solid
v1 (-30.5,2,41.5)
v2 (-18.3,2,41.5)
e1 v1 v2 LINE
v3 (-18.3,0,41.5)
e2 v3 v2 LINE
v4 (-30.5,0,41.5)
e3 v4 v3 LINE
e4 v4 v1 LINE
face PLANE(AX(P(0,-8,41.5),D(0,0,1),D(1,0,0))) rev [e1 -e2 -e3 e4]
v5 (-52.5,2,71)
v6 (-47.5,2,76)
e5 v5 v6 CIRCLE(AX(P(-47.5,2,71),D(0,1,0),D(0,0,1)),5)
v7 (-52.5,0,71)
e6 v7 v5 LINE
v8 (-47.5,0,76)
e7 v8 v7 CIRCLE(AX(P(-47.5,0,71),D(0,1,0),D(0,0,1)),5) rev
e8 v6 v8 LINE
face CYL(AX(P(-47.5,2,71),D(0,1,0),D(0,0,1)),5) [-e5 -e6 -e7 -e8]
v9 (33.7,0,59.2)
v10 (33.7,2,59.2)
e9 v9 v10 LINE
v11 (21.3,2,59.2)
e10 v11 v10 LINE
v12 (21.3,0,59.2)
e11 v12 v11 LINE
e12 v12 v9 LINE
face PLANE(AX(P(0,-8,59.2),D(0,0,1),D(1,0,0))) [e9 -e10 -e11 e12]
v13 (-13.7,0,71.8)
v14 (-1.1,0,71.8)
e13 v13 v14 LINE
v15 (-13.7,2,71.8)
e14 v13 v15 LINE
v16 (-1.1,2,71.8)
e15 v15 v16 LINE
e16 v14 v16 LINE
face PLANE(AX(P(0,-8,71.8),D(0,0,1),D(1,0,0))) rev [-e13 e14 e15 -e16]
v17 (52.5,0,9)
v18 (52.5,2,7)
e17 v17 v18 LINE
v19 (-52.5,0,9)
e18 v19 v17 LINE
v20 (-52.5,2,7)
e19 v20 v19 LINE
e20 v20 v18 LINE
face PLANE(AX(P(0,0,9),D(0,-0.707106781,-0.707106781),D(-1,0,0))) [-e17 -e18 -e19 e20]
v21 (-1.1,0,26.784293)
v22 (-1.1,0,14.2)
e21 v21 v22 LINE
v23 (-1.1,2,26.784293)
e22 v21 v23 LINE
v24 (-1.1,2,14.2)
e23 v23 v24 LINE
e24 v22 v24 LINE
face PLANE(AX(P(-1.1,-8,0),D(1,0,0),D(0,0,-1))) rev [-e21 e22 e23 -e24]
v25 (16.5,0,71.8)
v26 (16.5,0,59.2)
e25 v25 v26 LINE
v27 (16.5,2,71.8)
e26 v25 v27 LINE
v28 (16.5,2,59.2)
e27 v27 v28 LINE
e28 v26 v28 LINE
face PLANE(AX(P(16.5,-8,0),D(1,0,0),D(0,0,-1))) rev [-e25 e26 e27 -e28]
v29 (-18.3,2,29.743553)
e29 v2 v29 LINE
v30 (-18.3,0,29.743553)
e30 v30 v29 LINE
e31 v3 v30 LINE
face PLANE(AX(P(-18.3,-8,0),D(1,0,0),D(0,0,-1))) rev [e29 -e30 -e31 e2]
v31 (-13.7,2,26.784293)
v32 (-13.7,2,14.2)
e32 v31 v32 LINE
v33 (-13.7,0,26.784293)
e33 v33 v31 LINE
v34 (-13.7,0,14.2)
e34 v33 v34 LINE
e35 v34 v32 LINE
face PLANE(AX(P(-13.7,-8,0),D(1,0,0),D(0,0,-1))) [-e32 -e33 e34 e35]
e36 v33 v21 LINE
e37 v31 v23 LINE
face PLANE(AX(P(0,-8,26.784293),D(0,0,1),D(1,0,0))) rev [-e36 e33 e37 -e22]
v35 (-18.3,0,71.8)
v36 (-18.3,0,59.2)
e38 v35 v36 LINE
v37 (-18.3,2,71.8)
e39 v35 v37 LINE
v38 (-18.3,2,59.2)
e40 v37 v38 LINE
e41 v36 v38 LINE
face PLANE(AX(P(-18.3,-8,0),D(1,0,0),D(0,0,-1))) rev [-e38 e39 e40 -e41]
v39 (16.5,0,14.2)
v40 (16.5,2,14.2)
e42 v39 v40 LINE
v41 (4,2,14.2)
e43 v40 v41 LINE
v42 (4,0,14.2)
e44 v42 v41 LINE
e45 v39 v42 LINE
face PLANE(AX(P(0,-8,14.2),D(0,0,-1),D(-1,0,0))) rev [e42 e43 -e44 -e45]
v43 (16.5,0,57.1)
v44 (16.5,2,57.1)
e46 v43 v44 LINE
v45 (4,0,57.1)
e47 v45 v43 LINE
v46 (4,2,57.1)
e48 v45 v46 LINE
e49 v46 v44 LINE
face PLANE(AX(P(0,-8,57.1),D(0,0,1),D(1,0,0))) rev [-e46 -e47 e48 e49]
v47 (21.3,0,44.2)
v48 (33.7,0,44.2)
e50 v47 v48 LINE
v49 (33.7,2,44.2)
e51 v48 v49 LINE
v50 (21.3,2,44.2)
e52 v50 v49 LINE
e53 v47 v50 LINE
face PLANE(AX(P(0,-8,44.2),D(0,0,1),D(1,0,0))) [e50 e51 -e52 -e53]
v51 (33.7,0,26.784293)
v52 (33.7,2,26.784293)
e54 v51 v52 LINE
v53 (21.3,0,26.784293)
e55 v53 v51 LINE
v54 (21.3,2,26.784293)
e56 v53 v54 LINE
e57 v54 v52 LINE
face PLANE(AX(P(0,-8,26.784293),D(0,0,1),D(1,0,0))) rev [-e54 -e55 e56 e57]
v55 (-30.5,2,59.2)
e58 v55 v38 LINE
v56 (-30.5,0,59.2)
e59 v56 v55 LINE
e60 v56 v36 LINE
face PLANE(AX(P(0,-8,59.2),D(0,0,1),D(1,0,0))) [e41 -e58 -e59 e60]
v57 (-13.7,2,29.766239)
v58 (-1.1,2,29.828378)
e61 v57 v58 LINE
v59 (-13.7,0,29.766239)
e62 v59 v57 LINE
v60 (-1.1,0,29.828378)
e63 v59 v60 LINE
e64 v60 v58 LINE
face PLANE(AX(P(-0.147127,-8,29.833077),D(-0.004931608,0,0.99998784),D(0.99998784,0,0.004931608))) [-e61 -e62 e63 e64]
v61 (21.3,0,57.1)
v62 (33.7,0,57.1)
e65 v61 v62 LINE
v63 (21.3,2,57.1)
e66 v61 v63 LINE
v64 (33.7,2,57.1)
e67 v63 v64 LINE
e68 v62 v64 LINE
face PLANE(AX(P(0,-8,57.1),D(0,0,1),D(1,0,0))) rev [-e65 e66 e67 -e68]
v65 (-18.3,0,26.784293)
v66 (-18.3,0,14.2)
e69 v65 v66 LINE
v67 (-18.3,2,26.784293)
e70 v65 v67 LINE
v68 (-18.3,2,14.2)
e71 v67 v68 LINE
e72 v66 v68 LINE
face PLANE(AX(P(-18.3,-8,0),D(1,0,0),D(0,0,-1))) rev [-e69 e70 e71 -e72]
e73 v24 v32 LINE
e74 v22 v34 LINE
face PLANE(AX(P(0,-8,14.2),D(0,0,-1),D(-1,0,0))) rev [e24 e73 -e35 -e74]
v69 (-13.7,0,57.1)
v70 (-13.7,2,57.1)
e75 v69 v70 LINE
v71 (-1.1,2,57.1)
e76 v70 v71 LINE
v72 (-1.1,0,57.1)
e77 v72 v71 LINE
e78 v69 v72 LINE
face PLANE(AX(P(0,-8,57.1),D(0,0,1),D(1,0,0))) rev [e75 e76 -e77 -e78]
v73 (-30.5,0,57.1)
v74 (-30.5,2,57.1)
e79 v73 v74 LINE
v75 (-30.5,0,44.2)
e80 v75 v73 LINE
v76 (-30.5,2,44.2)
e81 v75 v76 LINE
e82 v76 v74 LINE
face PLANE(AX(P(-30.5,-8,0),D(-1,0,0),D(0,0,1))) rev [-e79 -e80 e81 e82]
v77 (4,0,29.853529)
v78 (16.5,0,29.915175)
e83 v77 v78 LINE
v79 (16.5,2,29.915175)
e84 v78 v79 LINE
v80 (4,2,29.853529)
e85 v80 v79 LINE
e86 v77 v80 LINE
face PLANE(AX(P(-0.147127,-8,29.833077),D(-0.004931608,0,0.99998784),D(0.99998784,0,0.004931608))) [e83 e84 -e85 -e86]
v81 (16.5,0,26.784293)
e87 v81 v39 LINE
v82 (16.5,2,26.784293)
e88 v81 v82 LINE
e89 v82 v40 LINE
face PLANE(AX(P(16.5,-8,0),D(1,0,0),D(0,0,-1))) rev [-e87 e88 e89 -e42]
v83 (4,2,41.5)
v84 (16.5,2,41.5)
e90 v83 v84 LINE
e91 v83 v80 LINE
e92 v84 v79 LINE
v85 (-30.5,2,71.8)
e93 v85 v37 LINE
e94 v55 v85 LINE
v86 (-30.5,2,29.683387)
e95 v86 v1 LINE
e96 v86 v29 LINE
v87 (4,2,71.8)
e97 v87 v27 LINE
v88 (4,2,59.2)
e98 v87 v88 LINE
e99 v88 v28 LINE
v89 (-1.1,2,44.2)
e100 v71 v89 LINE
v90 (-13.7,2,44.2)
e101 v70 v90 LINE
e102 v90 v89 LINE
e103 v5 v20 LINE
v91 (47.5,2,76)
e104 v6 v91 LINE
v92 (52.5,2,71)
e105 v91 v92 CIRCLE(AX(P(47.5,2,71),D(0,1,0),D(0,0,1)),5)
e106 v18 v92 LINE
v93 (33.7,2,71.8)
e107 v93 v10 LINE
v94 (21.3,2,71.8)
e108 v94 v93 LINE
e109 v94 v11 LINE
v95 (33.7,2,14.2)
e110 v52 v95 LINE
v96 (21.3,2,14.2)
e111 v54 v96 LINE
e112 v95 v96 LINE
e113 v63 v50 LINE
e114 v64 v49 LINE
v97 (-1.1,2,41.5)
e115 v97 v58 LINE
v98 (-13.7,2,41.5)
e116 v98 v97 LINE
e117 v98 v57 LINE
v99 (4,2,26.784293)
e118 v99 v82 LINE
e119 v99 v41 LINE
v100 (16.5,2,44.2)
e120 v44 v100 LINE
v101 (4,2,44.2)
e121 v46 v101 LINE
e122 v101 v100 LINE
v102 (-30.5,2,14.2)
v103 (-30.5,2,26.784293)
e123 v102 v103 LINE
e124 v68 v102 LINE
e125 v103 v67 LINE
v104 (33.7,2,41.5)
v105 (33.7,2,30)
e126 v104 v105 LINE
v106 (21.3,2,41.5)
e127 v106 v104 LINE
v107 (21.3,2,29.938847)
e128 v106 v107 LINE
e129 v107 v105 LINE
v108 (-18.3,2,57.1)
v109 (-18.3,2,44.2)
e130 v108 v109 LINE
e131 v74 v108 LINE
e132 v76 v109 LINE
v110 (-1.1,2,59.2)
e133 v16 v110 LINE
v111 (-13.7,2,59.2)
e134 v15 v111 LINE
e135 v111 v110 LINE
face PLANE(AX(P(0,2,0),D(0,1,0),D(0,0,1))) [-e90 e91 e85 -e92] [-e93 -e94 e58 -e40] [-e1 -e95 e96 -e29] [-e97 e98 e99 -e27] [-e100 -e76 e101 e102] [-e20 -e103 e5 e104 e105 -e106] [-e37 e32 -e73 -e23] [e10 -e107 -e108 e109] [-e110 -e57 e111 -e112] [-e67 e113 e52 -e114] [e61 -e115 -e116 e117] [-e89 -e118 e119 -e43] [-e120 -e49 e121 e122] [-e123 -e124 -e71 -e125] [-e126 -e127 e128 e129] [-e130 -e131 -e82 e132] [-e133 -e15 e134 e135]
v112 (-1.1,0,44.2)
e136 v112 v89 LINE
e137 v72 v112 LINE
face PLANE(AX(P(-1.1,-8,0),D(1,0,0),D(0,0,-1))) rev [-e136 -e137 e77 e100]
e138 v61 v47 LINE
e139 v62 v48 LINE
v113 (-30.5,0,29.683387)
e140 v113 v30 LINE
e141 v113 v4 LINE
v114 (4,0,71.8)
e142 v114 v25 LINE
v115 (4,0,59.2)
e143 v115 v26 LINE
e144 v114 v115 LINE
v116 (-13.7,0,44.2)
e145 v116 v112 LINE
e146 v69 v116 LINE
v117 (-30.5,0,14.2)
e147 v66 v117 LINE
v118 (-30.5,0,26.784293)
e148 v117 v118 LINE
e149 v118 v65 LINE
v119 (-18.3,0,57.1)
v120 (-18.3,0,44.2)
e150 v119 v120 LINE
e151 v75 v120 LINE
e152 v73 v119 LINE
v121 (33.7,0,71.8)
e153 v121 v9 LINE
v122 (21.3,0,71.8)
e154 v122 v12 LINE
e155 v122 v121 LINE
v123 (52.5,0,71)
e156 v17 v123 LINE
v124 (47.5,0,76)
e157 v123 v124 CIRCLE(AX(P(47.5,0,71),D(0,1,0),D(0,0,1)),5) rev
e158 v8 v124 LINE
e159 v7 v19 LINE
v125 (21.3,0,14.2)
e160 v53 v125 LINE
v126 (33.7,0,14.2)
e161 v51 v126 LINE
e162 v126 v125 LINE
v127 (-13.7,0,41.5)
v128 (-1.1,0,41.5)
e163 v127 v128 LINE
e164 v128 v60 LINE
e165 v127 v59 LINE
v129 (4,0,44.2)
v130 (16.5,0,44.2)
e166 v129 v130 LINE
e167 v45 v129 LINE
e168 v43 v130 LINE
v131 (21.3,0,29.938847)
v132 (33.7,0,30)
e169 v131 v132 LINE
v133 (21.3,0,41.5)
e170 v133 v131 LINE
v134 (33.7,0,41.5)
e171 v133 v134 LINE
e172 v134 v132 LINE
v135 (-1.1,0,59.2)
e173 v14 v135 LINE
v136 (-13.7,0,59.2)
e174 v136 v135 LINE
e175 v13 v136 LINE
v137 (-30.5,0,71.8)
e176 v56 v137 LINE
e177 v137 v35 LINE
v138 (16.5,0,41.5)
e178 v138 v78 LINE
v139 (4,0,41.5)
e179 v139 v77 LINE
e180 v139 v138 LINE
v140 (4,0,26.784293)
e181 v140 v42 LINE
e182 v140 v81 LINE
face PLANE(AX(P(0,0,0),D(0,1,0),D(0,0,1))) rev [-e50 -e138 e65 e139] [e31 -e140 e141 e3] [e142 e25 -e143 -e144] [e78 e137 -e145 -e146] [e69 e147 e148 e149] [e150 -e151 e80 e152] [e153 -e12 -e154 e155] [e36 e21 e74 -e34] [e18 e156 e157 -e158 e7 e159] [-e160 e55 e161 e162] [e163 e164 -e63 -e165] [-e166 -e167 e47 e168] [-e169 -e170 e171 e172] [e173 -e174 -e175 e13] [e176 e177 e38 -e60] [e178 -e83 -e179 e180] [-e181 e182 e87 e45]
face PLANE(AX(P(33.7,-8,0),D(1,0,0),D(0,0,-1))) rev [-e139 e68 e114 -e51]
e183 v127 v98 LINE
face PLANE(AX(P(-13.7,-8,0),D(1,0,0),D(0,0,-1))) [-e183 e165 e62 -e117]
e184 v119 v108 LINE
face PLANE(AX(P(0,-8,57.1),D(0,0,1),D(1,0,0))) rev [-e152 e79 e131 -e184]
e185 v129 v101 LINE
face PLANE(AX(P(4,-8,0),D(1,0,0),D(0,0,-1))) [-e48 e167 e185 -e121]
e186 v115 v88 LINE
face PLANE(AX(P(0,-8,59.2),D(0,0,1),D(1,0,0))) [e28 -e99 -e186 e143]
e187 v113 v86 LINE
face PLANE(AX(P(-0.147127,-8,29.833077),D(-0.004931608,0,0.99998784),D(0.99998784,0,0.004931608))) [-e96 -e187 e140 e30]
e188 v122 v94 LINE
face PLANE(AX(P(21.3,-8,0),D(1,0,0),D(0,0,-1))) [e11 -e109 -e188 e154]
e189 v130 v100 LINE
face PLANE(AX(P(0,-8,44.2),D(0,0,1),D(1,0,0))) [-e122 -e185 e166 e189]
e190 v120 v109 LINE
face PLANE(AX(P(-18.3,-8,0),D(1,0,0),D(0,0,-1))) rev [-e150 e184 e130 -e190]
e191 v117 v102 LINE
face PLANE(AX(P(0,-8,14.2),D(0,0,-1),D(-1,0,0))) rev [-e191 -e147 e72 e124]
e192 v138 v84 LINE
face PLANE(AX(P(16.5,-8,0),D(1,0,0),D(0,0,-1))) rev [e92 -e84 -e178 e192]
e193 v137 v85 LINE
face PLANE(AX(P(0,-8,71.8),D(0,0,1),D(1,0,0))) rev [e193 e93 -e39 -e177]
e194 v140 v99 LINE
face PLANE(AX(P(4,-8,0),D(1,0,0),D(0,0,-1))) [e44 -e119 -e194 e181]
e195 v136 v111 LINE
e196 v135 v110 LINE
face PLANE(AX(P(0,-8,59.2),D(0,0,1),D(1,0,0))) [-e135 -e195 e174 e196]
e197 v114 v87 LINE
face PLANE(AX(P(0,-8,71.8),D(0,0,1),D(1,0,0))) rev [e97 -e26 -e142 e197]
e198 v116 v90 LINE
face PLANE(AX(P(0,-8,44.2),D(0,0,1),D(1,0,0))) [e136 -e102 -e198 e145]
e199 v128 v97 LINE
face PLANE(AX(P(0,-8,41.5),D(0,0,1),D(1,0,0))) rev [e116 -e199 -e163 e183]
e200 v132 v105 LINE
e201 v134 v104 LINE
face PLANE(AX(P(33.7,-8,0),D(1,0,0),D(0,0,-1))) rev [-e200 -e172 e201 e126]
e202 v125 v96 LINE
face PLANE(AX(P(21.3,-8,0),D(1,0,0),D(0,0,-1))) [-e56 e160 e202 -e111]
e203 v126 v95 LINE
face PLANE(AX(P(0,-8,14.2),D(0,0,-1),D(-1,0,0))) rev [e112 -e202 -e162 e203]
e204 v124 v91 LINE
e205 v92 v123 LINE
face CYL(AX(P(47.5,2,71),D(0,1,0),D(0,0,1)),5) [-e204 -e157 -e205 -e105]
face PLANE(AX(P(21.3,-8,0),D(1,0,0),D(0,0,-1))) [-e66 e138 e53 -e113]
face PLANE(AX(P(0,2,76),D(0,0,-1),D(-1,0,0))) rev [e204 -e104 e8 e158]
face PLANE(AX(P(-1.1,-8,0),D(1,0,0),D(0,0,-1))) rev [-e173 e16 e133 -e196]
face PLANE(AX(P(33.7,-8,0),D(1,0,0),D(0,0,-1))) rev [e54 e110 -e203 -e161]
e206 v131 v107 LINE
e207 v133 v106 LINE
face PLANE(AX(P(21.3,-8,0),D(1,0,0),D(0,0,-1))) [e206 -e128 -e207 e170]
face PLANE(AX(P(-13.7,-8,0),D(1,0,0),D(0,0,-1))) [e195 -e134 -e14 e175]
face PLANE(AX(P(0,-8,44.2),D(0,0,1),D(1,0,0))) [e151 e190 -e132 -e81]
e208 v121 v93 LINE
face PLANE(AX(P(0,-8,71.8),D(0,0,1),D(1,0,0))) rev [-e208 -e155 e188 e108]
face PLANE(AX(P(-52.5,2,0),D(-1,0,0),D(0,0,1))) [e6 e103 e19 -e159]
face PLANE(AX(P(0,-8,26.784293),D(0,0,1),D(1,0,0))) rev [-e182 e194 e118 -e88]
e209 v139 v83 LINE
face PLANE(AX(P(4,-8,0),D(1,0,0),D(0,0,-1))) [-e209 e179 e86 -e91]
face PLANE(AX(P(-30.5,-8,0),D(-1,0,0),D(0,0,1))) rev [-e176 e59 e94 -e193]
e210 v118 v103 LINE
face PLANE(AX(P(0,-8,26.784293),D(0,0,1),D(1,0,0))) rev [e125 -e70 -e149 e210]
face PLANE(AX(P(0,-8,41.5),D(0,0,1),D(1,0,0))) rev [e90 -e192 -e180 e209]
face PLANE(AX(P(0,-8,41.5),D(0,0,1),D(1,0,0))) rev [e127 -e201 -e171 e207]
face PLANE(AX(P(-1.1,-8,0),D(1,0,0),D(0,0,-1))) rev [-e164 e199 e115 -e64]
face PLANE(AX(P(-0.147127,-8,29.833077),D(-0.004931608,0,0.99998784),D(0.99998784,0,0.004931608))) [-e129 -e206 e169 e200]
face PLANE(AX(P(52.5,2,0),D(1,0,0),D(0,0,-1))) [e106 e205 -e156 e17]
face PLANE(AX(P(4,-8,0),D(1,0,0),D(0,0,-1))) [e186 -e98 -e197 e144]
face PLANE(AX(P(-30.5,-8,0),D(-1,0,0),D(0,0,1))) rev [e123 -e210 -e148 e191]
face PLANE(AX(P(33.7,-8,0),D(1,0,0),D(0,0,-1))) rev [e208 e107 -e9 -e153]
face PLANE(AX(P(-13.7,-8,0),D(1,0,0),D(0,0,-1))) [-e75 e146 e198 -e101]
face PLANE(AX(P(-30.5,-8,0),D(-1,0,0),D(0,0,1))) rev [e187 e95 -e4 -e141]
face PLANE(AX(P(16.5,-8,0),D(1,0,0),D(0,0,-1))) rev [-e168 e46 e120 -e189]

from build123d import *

# Parameters (mm, degrees)
SKETCH2_W           = 105
SKETCH2_H           = 69
SKETCH2_W_2         = 12.176237233
SKETCH2_H_2         = 12
SKETCH2_W_3         = 12
SKETCH2_W_4         = 11
SKETCH2_H_3         = 11
SKETCH2_W_5         = 10.781198293
BOSS_EXTRUDE1_DEPTH = 2
FILLET1_R           = 5
FILLET2_R           = 5
CHAMFER1_SIZE       = 2
SKETCH3_W           = 12.4
SKETCH3_H           = 12.584292926
SKETCH3_W_2         = 12.5
SKETCH3_W_3         = 12.6
SKETCH3_W_4         = 12.2
SKETCH3_H_2         = 12.9
SKETCH3_H_3         = 12.6
CUT_EXTRUDE1_DEPTH  = 10
SKETCH4_W           = 0.6
SKETCH4_H           = 11
BOSS_EXTRUDE2_DEPTH = 2
SKETCH5_W           = 0.6
SKETCH5_H           = 11
BOSS_EXTRUDE3_DEPTH = 2
SKETCH6_W           = 0.8
SKETCH6_H           = 11
SKETCH6_W_2         = 0.4
SKETCH6_W_3         = 0.776237233
BOSS_EXTRUDE4_DEPTH = 2


with BuildPart() as part:
    # Sketch2 → Boss-Extrude1 (new body)
    with BuildSketch(Plane(origin=(0, 0, 0), x_dir=(1, 0, 0), z_dir=(0, 1, 0))):
        with Locations((0, -41.5)):
            Rectangle(SKETCH2_W, SKETCH2_H)
        with Locations((-23.611881384, -66)):
            Rectangle(SKETCH2_W_2, SKETCH2_H_2, mode=Mode.SUBTRACT)
        with Locations((11.3, -66)):
            Rectangle(SKETCH2_W_3, SKETCH2_H_2, mode=Mode.SUBTRACT)
        with Locations((28.8, -66)):
            Rectangle(SKETCH2_W_4, SKETCH2_H_2, mode=Mode.SUBTRACT)
        with Locations((28.8, -20.5)):
            Rectangle(SKETCH2_W_4, SKETCH2_H_3, mode=Mode.SUBTRACT)
        with Locations((11.3, -20.5)):
            Rectangle(SKETCH2_W_3, SKETCH2_H_3, mode=Mode.SUBTRACT)
        with Locations((-6.090599146, -20.5)):
            Rectangle(SKETCH2_W_5, SKETCH2_H_3, mode=Mode.SUBTRACT)
        with Locations((-6.090599146, -66)):
            Rectangle(SKETCH2_W_5, SKETCH2_H_2, mode=Mode.SUBTRACT)
        with Locations((-23.611881384, -20.5)):
            Rectangle(SKETCH2_W_2, SKETCH2_H_3, mode=Mode.SUBTRACT)
        with Locations((-23.611881384, -35.5)):
            Rectangle(SKETCH2_W_2, SKETCH2_H_3, mode=Mode.SUBTRACT)
        with Locations((-23.611881384, -50.5)):
            Rectangle(SKETCH2_W_2, SKETCH2_H_3, mode=Mode.SUBTRACT)
        with Locations((28.8, -50.5)):
            Rectangle(SKETCH2_W_4, SKETCH2_H_3, mode=Mode.SUBTRACT)
        with Locations((28.8, -35.5)):
            Rectangle(SKETCH2_W_4, SKETCH2_H_3, mode=Mode.SUBTRACT)
        with Locations((11.3, -50.5)):
            Rectangle(SKETCH2_W_3, SKETCH2_H_3, mode=Mode.SUBTRACT)
        with Locations((-6.090599146, -50.5)):
            Rectangle(SKETCH2_W_5, SKETCH2_H_3, mode=Mode.SUBTRACT)
        with Locations((-6.090599146, -35.5)):
            Rectangle(SKETCH2_W_5, SKETCH2_H_3, mode=Mode.SUBTRACT)
        with Locations((11.3, -35.5)):
            Rectangle(SKETCH2_W_3, SKETCH2_H_3, mode=Mode.SUBTRACT)
    extrude(amount=BOSS_EXTRUDE1_DEPTH)

    # Fillet1
    fillet1_edges = [part.edges().sort_by_distance(p)[0] for p in [
        (-52.5, 1, 76),
    ]]
    fillet(fillet1_edges, radius=FILLET1_R)

    # Fillet2
    fillet2_edges = [part.edges().sort_by_distance(p)[0] for p in [
        (52.5, 1, 76),
    ]]
    fillet(fillet2_edges, radius=FILLET2_R)

    # Chamfer1
    chamfer1_edges = [part.edges().sort_by_distance(p)[0] for p in [
        (0, 0, 7),
    ]]
    chamfer(chamfer1_edges, length=CHAMFER1_SIZE - 0.0001)  # a hair under: the kernel refuses the full size

    # Sketch3 → Cut-Extrude1 (cut)
    with BuildSketch(Plane(origin=(0, 2, 0), x_dir=(1, 0, 0), z_dir=(0, 1, 0))):
        with Locations((27.5, -20.492146463)):
            Rectangle(SKETCH3_W, SKETCH3_H)
        with Locations((10.25, -20.492146463)):
            Rectangle(SKETCH3_W_2, SKETCH3_H)
        with Locations((-7.4, -20.492146463)):
            Rectangle(SKETCH3_W_3, SKETCH3_H)
        with Locations((-24.4, -20.492146463)):
            Rectangle(SKETCH3_W_4, SKETCH3_H)
        Polygon((-30.5, -41.5), (-18.3, -41.5), (-18.3, -29.743553264), (-30.5, -29.683386914), align=None)
        Polygon((-13.7, -41.5), (-1.1, -41.5), (-1.1, -29.828377953), (-13.7, -29.766238937), align=None)
        Polygon((4, -41.5), (16.5, -41.5), (16.5, -29.91517531), (4, -29.85352946), align=None)
        Polygon((21.3, -41.5), (33.7, -41.5), (33.7, -30), (21.3, -29.938847317), align=None)
        with Locations((27.5, -50.65)):
            Rectangle(SKETCH3_W, SKETCH3_H_2)
        with Locations((10.25, -50.65)):
            Rectangle(SKETCH3_W_2, SKETCH3_H_2)
        with Locations((-7.4, -50.65)):
            Rectangle(SKETCH3_W_3, SKETCH3_H_2)
        with Locations((-24.4, -50.65)):
            Rectangle(SKETCH3_W_4, SKETCH3_H_2)
        with Locations((-24.4, -65.5)):
            Rectangle(SKETCH3_W_4, SKETCH3_H_3)
        with Locations((-7.4, -65.5)):
            Rectangle(SKETCH3_W_3, SKETCH3_H_3)
        with Locations((10.25, -65.5)):
            Rectangle(SKETCH3_W_2, SKETCH3_H_3)
        with Locations((27.5, -65.5)):
            Rectangle(SKETCH3_W, SKETCH3_H_3)
    extrude(amount=-CUT_EXTRUDE1_DEPTH, mode=Mode.SUBTRACT)

    # Sketch4 → Boss-Extrude2 (add)
    with BuildSketch(Plane(origin=(0, 2, 0), x_dir=(1, 0, 0), z_dir=(0, 1, 0))):
        with Locations((34, -20.5)):
            Rectangle(SKETCH4_W, SKETCH4_H)
    extrude(amount=-BOSS_EXTRUDE2_DEPTH)

    # Sketch5 → Boss-Extrude3 (add)
    with BuildSketch(Plane(origin=(0, 2, 0), x_dir=(1, 0, 0), z_dir=(0, 1, 0))):
        with Locations((34, -35.5)):
            Rectangle(SKETCH5_W, SKETCH5_H)
        with Locations((34, -50.5)):
            Rectangle(SKETCH5_W, SKETCH5_H)
        Polygon((33.7, -60), (34.3, -60), (34.3, -72), (23.3, -72), (23.3, -71.8), (33.7, -71.8), align=None)
    extrude(amount=-BOSS_EXTRUDE3_DEPTH)

    # Sketch6 → Boss-Extrude4 (add)
    with BuildSketch(Plane(origin=(0, 2, 0), x_dir=(1, 0, 0), z_dir=(0, 1, 0))):
        with Locations((16.9, -20.5)):
            Rectangle(SKETCH6_W, SKETCH6_H)
        with Locations((16.9, -35.5)):
            Rectangle(SKETCH6_W, SKETCH6_H)
        with Locations((16.9, -50.5)):
            Rectangle(SKETCH6_W, SKETCH6_H)
        Polygon((16.5, -60), (17.3, -60), (17.3, -72), (5.3, -72), (5.3, -71.8), (16.5, -71.8), align=None)
        Polygon((-1.1, -60), (-0.7, -60), (-0.7, -72), (-11.481198293, -72), (-11.481198293, -71.8), (-1.1, -71.8), align=None)
        Polygon((-18.3, -60), (-17.523762767, -60), (-17.523762767, -72), (-29.7, -72), (-29.7, -71.8), (-18.3, -71.8), align=None)
        with Locations((-0.9, -50.5)):
            Rectangle(SKETCH6_W_2, SKETCH6_H)
        with Locations((-0.9, -35.5)):
            Rectangle(SKETCH6_W_2, SKETCH6_H)
        with Locations((-0.9, -20.5)):
            Rectangle(SKETCH6_W_2, SKETCH6_H)
        with Locations((-17.911881384, -20.5)):
            Rectangle(SKETCH6_W_3, SKETCH6_H)
        with Locations((-17.911881384, -35.5)):
            Rectangle(SKETCH6_W_3, SKETCH6_H)
        with Locations((-17.911881384, -50.5)):
            Rectangle(SKETCH6_W_3, SKETCH6_H)
    extrude(amount=-BOSS_EXTRUDE4_DEPTH)


solid = part.part
